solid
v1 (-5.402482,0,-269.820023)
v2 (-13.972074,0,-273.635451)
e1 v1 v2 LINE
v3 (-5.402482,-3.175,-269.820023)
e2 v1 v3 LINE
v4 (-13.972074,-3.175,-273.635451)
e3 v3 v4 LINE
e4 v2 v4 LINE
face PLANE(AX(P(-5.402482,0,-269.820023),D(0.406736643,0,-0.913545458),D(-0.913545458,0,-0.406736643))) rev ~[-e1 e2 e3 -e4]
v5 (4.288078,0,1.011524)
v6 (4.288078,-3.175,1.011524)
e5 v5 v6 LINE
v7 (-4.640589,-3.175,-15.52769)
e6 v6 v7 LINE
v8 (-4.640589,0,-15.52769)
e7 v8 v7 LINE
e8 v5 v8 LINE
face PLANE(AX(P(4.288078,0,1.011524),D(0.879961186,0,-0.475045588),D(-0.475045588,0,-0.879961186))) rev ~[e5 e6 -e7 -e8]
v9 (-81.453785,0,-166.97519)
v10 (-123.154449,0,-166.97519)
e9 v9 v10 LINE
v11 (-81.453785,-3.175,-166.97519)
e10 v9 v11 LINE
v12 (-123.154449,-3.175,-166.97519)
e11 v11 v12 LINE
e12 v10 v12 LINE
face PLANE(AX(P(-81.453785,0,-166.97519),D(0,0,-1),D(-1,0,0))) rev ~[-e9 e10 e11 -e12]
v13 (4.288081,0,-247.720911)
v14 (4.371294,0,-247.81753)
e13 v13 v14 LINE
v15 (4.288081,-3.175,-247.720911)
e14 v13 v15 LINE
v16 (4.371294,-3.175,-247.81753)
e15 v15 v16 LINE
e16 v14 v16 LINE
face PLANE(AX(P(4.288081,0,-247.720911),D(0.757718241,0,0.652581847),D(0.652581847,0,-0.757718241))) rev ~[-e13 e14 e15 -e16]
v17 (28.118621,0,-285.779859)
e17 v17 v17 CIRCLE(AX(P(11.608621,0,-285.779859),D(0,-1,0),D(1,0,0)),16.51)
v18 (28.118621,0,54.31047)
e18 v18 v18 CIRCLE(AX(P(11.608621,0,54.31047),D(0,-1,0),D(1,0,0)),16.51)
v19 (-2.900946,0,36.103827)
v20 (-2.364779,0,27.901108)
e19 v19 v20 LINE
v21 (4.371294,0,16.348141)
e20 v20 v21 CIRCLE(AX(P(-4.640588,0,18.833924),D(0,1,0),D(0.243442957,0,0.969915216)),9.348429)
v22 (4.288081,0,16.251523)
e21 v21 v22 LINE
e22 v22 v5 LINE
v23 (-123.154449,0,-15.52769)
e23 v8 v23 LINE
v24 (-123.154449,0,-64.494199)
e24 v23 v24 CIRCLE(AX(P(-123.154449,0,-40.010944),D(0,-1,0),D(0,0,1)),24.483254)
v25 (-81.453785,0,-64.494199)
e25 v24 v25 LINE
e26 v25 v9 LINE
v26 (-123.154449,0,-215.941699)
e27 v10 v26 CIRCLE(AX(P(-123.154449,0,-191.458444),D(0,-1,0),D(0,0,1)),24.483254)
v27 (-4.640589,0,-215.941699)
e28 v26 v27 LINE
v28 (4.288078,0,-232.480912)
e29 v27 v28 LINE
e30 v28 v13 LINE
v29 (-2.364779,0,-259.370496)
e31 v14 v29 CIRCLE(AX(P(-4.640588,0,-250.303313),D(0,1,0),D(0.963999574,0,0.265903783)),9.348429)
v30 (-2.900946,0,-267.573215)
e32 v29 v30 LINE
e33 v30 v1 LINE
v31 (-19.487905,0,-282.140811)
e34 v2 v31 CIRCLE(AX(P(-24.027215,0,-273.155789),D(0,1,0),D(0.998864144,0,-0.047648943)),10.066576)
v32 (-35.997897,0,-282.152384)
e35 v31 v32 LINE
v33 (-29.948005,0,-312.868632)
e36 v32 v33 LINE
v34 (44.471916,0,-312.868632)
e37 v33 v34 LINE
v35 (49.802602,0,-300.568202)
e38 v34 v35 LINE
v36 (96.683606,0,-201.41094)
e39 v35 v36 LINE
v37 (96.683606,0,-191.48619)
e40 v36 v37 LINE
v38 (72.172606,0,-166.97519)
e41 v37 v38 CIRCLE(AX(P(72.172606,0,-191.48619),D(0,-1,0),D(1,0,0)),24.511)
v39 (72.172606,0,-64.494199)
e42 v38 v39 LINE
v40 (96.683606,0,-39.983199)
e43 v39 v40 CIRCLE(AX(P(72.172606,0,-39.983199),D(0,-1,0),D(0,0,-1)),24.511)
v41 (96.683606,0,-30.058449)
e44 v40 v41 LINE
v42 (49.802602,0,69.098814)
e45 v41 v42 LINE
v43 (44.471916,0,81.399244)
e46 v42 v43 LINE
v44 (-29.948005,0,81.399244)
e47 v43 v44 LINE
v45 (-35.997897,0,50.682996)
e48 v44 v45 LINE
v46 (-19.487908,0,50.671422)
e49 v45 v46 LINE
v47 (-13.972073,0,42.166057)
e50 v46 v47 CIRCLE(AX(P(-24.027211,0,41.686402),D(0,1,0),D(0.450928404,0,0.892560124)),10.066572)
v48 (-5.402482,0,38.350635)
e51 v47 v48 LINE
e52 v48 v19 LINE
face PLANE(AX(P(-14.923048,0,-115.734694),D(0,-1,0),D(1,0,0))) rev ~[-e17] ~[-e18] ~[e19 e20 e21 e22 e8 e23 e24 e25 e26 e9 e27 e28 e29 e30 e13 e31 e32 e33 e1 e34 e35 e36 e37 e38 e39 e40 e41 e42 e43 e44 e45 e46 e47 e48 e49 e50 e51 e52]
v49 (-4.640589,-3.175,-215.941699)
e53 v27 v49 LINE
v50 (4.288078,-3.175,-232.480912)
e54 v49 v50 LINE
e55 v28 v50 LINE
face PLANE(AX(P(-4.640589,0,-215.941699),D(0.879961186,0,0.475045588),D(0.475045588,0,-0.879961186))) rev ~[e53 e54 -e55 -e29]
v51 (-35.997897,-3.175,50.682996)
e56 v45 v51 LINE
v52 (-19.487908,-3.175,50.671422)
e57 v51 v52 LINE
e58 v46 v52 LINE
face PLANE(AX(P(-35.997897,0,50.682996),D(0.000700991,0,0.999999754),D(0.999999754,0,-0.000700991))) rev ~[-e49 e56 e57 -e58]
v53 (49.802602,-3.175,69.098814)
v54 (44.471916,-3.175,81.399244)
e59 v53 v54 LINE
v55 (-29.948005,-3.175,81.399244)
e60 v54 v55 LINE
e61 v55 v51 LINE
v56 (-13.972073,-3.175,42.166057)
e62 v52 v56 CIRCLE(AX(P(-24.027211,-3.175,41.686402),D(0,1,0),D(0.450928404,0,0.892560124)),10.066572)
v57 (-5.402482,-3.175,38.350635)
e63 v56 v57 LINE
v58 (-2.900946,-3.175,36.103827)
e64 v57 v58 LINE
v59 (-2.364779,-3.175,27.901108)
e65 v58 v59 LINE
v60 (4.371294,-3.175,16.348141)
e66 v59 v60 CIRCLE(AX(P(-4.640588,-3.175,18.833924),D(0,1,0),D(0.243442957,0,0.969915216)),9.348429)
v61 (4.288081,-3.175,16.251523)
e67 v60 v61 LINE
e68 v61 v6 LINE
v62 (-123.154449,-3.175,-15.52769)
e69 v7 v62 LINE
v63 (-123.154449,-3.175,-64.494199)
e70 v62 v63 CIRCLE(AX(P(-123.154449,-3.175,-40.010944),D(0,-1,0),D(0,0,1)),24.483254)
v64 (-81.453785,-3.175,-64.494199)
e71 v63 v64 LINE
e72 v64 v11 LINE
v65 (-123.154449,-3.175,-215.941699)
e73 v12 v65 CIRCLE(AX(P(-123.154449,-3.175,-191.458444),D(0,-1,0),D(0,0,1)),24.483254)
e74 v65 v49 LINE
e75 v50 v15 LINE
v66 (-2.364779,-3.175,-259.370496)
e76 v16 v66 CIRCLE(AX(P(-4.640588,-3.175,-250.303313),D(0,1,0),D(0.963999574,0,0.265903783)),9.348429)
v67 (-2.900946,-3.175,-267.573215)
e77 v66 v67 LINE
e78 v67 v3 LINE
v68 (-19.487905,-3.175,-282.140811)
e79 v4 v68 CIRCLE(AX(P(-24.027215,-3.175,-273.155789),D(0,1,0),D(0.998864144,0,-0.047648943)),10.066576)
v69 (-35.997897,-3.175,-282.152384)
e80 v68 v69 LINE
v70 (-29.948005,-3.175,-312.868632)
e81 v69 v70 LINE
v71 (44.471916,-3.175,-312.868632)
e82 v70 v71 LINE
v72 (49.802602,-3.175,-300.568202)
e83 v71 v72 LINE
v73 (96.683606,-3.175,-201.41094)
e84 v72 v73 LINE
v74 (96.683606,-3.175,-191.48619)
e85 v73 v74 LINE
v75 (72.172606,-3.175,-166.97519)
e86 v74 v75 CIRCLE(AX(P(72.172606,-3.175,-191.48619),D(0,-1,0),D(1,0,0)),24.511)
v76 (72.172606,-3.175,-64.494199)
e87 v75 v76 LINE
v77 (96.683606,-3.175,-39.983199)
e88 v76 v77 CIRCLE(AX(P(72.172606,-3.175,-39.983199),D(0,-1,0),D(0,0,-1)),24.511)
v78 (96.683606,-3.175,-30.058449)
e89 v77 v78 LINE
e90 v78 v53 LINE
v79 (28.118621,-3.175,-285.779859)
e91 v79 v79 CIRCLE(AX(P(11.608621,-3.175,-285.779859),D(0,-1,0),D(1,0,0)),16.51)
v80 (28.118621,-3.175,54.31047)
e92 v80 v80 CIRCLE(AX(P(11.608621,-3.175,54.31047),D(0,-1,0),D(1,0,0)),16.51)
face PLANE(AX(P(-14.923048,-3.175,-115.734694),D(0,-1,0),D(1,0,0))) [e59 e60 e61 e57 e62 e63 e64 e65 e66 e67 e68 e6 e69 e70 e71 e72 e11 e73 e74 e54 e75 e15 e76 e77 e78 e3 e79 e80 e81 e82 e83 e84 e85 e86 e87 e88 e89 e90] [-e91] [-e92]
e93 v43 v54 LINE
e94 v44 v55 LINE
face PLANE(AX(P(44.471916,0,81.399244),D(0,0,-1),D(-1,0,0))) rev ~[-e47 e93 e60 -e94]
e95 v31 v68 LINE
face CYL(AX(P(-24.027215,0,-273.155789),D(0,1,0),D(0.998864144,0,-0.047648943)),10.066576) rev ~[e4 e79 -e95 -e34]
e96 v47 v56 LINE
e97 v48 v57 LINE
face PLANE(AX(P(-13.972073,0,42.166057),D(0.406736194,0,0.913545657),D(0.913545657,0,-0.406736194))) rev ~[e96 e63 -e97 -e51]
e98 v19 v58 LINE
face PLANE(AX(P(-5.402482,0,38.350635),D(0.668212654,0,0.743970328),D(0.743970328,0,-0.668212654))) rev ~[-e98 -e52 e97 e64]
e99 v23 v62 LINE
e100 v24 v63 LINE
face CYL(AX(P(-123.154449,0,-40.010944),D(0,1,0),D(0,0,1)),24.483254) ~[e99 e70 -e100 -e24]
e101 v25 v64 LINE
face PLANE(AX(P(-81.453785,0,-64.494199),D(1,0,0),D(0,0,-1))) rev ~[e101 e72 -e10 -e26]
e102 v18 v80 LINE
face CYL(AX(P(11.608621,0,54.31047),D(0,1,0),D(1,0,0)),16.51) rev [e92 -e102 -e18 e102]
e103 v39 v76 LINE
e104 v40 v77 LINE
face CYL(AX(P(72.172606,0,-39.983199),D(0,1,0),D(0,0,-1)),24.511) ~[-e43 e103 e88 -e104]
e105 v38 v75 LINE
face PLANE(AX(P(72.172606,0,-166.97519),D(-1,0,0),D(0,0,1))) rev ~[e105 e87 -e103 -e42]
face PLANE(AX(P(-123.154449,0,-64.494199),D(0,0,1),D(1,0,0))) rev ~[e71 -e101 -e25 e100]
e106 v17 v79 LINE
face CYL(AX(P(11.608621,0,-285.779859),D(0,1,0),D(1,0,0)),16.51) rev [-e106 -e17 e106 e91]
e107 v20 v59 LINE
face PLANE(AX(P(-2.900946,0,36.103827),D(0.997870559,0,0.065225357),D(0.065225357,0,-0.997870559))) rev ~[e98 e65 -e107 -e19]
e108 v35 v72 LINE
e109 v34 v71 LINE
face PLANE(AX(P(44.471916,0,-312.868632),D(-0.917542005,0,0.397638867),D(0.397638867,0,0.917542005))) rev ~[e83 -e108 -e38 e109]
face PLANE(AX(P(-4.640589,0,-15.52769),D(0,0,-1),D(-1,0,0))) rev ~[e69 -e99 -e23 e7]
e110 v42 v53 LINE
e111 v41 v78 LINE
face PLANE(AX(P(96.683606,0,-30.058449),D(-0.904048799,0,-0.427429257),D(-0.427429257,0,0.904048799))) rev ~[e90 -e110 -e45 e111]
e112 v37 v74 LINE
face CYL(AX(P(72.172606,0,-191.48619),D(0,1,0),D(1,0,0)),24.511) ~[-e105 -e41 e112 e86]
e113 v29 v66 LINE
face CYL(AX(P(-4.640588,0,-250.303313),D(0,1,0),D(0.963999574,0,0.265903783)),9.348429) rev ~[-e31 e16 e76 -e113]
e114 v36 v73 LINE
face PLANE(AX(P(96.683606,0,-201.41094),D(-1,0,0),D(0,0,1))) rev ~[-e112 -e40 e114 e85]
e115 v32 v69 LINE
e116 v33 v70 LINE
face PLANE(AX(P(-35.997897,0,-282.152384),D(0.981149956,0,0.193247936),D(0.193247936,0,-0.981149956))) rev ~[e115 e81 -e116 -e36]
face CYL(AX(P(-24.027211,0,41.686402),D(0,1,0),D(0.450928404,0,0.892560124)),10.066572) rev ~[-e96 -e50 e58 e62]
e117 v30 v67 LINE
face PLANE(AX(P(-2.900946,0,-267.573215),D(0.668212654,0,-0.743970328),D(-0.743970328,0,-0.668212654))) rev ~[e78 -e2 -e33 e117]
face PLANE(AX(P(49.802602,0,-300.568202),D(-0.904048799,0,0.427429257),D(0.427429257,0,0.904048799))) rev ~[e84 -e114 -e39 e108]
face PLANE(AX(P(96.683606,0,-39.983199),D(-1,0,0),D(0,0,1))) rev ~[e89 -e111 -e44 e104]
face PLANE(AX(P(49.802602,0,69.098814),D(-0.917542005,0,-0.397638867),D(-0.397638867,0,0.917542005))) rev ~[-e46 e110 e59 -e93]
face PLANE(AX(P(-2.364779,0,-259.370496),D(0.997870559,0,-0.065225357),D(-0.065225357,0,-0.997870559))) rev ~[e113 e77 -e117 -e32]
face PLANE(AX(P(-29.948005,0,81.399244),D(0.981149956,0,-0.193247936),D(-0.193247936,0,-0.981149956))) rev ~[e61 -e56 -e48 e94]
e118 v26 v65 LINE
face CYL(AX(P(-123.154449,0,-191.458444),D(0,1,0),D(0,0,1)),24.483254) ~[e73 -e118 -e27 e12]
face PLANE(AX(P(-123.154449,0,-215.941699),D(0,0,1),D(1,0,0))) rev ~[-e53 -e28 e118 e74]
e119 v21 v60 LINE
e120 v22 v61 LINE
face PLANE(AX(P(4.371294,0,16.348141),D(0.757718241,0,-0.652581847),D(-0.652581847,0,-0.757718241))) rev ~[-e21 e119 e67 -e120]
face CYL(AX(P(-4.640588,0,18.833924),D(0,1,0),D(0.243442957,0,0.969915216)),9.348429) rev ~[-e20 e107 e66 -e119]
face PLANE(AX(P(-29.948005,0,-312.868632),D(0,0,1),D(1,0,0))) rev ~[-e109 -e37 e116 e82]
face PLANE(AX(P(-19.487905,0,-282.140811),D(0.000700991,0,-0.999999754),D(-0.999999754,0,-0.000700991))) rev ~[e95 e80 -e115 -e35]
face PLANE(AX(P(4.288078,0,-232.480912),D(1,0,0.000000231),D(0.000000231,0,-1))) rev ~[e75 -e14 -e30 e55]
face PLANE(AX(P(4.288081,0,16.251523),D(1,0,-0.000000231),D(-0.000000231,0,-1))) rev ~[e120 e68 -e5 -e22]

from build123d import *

# Parameters (mm, degrees)
F0_R     = 16.51
F1_DEPTH = 3.175


# Not quite as in the source:
# - ends of sketch curves that miss each other by under 0.0002 mm in the source are joined
# - a feature names something its author has since deleted; it is built from what else it names


with BuildPart() as f1:
    # F0 (on Front) → F1 (new body)
    with BuildSketch(Plane.XZ):
        with BuildLine():
            Line((72.172606051, -154.628444229), (72.172606051, -76.840944229))
            Line((72.172606051, -76.840944229), (72.172606051, -64.494198626))
            ThreePointArc((72.172606051, -64.494198626), (89.5045003647, -57.3150929397), (96.683606051, -39.983198626))
            Line((96.683606051, -39.983198626), (96.683606051, -30.0584486086))
            Line((96.683606051, -30.0584486086), (49.8026024117, 69.0988139849))
            Line((49.8026024117, 69.0988139849), (44.4719158113, 81.3992435336))
            Line((44.4719158113, 81.3992435336), (-29.9480052508, 81.3992435336))
            Line((-29.9480052508, 81.3992435336), (-35.9978974571, 50.6829957967))
            Line((-35.9978974571, 50.6829957967), (-19.4879078689, 50.6714224456))
            ThreePointArc((-19.4879078689, 50.6714224456), (-15.5812211009, 47.1637298884), (-13.9720730804, 42.1660573792))
            Line((-13.9720730804, 42.1660573792), (-5.4024819992, 38.3506346508))
            Line((-5.4024819992, 38.3506346508), (-2.9009456417, 36.1038269705))
            Line((-2.9009456417, 36.1038269705), (-2.3647786124, 27.9011076368))
            ThreePointArc((-2.3647786124, 27.9011076368), (3.4353485173, 23.5426794776), (4.3712937617, 16.3481414632))
            Line((4.3712937617, 16.3481414632), (4.2880811809, 16.2515226396))
            Line((4.2880811809, 16.2515226396), (4.2880776677, 1.0115236557))
            Line((4.2880776677, 1.0115236557), (-4.6405893252, -15.5276898319))
            Line((-4.6405893252, -15.5276898319), (-123.1544493252, -15.5276898319))
            ThreePointArc((-123.1544493252, -15.5276898319), (-147.6377037222, -40.010944229), (-123.1544493252, -64.494198626))
            Line((-123.1544493252, -64.494198626), (-81.4537847014, -64.494198626))
            Line((-81.4537847014, -64.494198626), (-81.4537847014, -76.840944229))
            Line((-81.4537847014, -76.840944229), (-81.4537847014, -154.628444229))
            Line((-81.4537847014, -154.628444229), (-81.4537847014, -166.9751898319))
            Line((-81.4537847014, -166.9751898319), (-123.1544493252, -166.9751898319))
            ThreePointArc((-123.1544493252, -166.9751898319), (-147.6377037222, -191.458444229), (-123.1544493252, -215.941698626))
            Line((-123.1544493252, -215.941698626), (-4.6405893252, -215.941698626))
            Line((-4.6405893252, -215.941698626), (4.2880776677, -232.4809121137))
            Line((4.2880776677, -232.4809121137), (4.2880811809, -247.7209110976))
            Line((4.2880811809, -247.7209110976), (4.3712937617, -247.8175299212))
            ThreePointArc((4.3712937617, -247.8175299212), (3.4353485173, -255.0120679356), (-2.3647786124, -259.3704960948))
            Line((-2.3647786124, -259.3704960948), (-2.9009456417, -267.5732154285))
            Line((-2.9009456417, -267.5732154285), (-5.4024819992, -269.8200231088))
            Line((-5.4024819992, -269.8200231088), (-13.9720735102, -273.6354510709))
            ThreePointArc((-13.9720735102, -273.6354510709), (-15.5812211009, -278.6331183464), (-19.487905219, -282.1408109018))
            Line((-19.487905219, -282.1408109018), (-35.9978974571, -282.1523842547))
            Line((-35.9978974571, -282.1523842547), (-29.9480052508, -312.8686319916))
            Line((-29.9480052508, -312.8686319916), (44.4719158113, -312.8686319916))
            Line((44.4719158113, -312.8686319916), (49.8026024117, -300.5682024429))
            Line((49.8026024117, -300.5682024429), (96.683606051, -201.4109398494))
            Line((96.683606051, -201.4109398494), (96.683606051, -191.4861898319))
            ThreePointArc((96.683606051, -191.4861898319), (89.5045003647, -174.1542955183), (72.172606051, -166.9751898319))
            Line((72.172606051, -166.9751898319), (72.172606051, -154.628444229))
        make_face()
        with Locations((11.6086210255, -285.7798588113)):
            Circle(F0_R, mode=Mode.SUBTRACT)
        with Locations((11.6086210255, 54.3104703533)):
            Circle(F0_R, mode=Mode.SUBTRACT)
    extrude(amount=F1_DEPTH)


solid = f1.part
